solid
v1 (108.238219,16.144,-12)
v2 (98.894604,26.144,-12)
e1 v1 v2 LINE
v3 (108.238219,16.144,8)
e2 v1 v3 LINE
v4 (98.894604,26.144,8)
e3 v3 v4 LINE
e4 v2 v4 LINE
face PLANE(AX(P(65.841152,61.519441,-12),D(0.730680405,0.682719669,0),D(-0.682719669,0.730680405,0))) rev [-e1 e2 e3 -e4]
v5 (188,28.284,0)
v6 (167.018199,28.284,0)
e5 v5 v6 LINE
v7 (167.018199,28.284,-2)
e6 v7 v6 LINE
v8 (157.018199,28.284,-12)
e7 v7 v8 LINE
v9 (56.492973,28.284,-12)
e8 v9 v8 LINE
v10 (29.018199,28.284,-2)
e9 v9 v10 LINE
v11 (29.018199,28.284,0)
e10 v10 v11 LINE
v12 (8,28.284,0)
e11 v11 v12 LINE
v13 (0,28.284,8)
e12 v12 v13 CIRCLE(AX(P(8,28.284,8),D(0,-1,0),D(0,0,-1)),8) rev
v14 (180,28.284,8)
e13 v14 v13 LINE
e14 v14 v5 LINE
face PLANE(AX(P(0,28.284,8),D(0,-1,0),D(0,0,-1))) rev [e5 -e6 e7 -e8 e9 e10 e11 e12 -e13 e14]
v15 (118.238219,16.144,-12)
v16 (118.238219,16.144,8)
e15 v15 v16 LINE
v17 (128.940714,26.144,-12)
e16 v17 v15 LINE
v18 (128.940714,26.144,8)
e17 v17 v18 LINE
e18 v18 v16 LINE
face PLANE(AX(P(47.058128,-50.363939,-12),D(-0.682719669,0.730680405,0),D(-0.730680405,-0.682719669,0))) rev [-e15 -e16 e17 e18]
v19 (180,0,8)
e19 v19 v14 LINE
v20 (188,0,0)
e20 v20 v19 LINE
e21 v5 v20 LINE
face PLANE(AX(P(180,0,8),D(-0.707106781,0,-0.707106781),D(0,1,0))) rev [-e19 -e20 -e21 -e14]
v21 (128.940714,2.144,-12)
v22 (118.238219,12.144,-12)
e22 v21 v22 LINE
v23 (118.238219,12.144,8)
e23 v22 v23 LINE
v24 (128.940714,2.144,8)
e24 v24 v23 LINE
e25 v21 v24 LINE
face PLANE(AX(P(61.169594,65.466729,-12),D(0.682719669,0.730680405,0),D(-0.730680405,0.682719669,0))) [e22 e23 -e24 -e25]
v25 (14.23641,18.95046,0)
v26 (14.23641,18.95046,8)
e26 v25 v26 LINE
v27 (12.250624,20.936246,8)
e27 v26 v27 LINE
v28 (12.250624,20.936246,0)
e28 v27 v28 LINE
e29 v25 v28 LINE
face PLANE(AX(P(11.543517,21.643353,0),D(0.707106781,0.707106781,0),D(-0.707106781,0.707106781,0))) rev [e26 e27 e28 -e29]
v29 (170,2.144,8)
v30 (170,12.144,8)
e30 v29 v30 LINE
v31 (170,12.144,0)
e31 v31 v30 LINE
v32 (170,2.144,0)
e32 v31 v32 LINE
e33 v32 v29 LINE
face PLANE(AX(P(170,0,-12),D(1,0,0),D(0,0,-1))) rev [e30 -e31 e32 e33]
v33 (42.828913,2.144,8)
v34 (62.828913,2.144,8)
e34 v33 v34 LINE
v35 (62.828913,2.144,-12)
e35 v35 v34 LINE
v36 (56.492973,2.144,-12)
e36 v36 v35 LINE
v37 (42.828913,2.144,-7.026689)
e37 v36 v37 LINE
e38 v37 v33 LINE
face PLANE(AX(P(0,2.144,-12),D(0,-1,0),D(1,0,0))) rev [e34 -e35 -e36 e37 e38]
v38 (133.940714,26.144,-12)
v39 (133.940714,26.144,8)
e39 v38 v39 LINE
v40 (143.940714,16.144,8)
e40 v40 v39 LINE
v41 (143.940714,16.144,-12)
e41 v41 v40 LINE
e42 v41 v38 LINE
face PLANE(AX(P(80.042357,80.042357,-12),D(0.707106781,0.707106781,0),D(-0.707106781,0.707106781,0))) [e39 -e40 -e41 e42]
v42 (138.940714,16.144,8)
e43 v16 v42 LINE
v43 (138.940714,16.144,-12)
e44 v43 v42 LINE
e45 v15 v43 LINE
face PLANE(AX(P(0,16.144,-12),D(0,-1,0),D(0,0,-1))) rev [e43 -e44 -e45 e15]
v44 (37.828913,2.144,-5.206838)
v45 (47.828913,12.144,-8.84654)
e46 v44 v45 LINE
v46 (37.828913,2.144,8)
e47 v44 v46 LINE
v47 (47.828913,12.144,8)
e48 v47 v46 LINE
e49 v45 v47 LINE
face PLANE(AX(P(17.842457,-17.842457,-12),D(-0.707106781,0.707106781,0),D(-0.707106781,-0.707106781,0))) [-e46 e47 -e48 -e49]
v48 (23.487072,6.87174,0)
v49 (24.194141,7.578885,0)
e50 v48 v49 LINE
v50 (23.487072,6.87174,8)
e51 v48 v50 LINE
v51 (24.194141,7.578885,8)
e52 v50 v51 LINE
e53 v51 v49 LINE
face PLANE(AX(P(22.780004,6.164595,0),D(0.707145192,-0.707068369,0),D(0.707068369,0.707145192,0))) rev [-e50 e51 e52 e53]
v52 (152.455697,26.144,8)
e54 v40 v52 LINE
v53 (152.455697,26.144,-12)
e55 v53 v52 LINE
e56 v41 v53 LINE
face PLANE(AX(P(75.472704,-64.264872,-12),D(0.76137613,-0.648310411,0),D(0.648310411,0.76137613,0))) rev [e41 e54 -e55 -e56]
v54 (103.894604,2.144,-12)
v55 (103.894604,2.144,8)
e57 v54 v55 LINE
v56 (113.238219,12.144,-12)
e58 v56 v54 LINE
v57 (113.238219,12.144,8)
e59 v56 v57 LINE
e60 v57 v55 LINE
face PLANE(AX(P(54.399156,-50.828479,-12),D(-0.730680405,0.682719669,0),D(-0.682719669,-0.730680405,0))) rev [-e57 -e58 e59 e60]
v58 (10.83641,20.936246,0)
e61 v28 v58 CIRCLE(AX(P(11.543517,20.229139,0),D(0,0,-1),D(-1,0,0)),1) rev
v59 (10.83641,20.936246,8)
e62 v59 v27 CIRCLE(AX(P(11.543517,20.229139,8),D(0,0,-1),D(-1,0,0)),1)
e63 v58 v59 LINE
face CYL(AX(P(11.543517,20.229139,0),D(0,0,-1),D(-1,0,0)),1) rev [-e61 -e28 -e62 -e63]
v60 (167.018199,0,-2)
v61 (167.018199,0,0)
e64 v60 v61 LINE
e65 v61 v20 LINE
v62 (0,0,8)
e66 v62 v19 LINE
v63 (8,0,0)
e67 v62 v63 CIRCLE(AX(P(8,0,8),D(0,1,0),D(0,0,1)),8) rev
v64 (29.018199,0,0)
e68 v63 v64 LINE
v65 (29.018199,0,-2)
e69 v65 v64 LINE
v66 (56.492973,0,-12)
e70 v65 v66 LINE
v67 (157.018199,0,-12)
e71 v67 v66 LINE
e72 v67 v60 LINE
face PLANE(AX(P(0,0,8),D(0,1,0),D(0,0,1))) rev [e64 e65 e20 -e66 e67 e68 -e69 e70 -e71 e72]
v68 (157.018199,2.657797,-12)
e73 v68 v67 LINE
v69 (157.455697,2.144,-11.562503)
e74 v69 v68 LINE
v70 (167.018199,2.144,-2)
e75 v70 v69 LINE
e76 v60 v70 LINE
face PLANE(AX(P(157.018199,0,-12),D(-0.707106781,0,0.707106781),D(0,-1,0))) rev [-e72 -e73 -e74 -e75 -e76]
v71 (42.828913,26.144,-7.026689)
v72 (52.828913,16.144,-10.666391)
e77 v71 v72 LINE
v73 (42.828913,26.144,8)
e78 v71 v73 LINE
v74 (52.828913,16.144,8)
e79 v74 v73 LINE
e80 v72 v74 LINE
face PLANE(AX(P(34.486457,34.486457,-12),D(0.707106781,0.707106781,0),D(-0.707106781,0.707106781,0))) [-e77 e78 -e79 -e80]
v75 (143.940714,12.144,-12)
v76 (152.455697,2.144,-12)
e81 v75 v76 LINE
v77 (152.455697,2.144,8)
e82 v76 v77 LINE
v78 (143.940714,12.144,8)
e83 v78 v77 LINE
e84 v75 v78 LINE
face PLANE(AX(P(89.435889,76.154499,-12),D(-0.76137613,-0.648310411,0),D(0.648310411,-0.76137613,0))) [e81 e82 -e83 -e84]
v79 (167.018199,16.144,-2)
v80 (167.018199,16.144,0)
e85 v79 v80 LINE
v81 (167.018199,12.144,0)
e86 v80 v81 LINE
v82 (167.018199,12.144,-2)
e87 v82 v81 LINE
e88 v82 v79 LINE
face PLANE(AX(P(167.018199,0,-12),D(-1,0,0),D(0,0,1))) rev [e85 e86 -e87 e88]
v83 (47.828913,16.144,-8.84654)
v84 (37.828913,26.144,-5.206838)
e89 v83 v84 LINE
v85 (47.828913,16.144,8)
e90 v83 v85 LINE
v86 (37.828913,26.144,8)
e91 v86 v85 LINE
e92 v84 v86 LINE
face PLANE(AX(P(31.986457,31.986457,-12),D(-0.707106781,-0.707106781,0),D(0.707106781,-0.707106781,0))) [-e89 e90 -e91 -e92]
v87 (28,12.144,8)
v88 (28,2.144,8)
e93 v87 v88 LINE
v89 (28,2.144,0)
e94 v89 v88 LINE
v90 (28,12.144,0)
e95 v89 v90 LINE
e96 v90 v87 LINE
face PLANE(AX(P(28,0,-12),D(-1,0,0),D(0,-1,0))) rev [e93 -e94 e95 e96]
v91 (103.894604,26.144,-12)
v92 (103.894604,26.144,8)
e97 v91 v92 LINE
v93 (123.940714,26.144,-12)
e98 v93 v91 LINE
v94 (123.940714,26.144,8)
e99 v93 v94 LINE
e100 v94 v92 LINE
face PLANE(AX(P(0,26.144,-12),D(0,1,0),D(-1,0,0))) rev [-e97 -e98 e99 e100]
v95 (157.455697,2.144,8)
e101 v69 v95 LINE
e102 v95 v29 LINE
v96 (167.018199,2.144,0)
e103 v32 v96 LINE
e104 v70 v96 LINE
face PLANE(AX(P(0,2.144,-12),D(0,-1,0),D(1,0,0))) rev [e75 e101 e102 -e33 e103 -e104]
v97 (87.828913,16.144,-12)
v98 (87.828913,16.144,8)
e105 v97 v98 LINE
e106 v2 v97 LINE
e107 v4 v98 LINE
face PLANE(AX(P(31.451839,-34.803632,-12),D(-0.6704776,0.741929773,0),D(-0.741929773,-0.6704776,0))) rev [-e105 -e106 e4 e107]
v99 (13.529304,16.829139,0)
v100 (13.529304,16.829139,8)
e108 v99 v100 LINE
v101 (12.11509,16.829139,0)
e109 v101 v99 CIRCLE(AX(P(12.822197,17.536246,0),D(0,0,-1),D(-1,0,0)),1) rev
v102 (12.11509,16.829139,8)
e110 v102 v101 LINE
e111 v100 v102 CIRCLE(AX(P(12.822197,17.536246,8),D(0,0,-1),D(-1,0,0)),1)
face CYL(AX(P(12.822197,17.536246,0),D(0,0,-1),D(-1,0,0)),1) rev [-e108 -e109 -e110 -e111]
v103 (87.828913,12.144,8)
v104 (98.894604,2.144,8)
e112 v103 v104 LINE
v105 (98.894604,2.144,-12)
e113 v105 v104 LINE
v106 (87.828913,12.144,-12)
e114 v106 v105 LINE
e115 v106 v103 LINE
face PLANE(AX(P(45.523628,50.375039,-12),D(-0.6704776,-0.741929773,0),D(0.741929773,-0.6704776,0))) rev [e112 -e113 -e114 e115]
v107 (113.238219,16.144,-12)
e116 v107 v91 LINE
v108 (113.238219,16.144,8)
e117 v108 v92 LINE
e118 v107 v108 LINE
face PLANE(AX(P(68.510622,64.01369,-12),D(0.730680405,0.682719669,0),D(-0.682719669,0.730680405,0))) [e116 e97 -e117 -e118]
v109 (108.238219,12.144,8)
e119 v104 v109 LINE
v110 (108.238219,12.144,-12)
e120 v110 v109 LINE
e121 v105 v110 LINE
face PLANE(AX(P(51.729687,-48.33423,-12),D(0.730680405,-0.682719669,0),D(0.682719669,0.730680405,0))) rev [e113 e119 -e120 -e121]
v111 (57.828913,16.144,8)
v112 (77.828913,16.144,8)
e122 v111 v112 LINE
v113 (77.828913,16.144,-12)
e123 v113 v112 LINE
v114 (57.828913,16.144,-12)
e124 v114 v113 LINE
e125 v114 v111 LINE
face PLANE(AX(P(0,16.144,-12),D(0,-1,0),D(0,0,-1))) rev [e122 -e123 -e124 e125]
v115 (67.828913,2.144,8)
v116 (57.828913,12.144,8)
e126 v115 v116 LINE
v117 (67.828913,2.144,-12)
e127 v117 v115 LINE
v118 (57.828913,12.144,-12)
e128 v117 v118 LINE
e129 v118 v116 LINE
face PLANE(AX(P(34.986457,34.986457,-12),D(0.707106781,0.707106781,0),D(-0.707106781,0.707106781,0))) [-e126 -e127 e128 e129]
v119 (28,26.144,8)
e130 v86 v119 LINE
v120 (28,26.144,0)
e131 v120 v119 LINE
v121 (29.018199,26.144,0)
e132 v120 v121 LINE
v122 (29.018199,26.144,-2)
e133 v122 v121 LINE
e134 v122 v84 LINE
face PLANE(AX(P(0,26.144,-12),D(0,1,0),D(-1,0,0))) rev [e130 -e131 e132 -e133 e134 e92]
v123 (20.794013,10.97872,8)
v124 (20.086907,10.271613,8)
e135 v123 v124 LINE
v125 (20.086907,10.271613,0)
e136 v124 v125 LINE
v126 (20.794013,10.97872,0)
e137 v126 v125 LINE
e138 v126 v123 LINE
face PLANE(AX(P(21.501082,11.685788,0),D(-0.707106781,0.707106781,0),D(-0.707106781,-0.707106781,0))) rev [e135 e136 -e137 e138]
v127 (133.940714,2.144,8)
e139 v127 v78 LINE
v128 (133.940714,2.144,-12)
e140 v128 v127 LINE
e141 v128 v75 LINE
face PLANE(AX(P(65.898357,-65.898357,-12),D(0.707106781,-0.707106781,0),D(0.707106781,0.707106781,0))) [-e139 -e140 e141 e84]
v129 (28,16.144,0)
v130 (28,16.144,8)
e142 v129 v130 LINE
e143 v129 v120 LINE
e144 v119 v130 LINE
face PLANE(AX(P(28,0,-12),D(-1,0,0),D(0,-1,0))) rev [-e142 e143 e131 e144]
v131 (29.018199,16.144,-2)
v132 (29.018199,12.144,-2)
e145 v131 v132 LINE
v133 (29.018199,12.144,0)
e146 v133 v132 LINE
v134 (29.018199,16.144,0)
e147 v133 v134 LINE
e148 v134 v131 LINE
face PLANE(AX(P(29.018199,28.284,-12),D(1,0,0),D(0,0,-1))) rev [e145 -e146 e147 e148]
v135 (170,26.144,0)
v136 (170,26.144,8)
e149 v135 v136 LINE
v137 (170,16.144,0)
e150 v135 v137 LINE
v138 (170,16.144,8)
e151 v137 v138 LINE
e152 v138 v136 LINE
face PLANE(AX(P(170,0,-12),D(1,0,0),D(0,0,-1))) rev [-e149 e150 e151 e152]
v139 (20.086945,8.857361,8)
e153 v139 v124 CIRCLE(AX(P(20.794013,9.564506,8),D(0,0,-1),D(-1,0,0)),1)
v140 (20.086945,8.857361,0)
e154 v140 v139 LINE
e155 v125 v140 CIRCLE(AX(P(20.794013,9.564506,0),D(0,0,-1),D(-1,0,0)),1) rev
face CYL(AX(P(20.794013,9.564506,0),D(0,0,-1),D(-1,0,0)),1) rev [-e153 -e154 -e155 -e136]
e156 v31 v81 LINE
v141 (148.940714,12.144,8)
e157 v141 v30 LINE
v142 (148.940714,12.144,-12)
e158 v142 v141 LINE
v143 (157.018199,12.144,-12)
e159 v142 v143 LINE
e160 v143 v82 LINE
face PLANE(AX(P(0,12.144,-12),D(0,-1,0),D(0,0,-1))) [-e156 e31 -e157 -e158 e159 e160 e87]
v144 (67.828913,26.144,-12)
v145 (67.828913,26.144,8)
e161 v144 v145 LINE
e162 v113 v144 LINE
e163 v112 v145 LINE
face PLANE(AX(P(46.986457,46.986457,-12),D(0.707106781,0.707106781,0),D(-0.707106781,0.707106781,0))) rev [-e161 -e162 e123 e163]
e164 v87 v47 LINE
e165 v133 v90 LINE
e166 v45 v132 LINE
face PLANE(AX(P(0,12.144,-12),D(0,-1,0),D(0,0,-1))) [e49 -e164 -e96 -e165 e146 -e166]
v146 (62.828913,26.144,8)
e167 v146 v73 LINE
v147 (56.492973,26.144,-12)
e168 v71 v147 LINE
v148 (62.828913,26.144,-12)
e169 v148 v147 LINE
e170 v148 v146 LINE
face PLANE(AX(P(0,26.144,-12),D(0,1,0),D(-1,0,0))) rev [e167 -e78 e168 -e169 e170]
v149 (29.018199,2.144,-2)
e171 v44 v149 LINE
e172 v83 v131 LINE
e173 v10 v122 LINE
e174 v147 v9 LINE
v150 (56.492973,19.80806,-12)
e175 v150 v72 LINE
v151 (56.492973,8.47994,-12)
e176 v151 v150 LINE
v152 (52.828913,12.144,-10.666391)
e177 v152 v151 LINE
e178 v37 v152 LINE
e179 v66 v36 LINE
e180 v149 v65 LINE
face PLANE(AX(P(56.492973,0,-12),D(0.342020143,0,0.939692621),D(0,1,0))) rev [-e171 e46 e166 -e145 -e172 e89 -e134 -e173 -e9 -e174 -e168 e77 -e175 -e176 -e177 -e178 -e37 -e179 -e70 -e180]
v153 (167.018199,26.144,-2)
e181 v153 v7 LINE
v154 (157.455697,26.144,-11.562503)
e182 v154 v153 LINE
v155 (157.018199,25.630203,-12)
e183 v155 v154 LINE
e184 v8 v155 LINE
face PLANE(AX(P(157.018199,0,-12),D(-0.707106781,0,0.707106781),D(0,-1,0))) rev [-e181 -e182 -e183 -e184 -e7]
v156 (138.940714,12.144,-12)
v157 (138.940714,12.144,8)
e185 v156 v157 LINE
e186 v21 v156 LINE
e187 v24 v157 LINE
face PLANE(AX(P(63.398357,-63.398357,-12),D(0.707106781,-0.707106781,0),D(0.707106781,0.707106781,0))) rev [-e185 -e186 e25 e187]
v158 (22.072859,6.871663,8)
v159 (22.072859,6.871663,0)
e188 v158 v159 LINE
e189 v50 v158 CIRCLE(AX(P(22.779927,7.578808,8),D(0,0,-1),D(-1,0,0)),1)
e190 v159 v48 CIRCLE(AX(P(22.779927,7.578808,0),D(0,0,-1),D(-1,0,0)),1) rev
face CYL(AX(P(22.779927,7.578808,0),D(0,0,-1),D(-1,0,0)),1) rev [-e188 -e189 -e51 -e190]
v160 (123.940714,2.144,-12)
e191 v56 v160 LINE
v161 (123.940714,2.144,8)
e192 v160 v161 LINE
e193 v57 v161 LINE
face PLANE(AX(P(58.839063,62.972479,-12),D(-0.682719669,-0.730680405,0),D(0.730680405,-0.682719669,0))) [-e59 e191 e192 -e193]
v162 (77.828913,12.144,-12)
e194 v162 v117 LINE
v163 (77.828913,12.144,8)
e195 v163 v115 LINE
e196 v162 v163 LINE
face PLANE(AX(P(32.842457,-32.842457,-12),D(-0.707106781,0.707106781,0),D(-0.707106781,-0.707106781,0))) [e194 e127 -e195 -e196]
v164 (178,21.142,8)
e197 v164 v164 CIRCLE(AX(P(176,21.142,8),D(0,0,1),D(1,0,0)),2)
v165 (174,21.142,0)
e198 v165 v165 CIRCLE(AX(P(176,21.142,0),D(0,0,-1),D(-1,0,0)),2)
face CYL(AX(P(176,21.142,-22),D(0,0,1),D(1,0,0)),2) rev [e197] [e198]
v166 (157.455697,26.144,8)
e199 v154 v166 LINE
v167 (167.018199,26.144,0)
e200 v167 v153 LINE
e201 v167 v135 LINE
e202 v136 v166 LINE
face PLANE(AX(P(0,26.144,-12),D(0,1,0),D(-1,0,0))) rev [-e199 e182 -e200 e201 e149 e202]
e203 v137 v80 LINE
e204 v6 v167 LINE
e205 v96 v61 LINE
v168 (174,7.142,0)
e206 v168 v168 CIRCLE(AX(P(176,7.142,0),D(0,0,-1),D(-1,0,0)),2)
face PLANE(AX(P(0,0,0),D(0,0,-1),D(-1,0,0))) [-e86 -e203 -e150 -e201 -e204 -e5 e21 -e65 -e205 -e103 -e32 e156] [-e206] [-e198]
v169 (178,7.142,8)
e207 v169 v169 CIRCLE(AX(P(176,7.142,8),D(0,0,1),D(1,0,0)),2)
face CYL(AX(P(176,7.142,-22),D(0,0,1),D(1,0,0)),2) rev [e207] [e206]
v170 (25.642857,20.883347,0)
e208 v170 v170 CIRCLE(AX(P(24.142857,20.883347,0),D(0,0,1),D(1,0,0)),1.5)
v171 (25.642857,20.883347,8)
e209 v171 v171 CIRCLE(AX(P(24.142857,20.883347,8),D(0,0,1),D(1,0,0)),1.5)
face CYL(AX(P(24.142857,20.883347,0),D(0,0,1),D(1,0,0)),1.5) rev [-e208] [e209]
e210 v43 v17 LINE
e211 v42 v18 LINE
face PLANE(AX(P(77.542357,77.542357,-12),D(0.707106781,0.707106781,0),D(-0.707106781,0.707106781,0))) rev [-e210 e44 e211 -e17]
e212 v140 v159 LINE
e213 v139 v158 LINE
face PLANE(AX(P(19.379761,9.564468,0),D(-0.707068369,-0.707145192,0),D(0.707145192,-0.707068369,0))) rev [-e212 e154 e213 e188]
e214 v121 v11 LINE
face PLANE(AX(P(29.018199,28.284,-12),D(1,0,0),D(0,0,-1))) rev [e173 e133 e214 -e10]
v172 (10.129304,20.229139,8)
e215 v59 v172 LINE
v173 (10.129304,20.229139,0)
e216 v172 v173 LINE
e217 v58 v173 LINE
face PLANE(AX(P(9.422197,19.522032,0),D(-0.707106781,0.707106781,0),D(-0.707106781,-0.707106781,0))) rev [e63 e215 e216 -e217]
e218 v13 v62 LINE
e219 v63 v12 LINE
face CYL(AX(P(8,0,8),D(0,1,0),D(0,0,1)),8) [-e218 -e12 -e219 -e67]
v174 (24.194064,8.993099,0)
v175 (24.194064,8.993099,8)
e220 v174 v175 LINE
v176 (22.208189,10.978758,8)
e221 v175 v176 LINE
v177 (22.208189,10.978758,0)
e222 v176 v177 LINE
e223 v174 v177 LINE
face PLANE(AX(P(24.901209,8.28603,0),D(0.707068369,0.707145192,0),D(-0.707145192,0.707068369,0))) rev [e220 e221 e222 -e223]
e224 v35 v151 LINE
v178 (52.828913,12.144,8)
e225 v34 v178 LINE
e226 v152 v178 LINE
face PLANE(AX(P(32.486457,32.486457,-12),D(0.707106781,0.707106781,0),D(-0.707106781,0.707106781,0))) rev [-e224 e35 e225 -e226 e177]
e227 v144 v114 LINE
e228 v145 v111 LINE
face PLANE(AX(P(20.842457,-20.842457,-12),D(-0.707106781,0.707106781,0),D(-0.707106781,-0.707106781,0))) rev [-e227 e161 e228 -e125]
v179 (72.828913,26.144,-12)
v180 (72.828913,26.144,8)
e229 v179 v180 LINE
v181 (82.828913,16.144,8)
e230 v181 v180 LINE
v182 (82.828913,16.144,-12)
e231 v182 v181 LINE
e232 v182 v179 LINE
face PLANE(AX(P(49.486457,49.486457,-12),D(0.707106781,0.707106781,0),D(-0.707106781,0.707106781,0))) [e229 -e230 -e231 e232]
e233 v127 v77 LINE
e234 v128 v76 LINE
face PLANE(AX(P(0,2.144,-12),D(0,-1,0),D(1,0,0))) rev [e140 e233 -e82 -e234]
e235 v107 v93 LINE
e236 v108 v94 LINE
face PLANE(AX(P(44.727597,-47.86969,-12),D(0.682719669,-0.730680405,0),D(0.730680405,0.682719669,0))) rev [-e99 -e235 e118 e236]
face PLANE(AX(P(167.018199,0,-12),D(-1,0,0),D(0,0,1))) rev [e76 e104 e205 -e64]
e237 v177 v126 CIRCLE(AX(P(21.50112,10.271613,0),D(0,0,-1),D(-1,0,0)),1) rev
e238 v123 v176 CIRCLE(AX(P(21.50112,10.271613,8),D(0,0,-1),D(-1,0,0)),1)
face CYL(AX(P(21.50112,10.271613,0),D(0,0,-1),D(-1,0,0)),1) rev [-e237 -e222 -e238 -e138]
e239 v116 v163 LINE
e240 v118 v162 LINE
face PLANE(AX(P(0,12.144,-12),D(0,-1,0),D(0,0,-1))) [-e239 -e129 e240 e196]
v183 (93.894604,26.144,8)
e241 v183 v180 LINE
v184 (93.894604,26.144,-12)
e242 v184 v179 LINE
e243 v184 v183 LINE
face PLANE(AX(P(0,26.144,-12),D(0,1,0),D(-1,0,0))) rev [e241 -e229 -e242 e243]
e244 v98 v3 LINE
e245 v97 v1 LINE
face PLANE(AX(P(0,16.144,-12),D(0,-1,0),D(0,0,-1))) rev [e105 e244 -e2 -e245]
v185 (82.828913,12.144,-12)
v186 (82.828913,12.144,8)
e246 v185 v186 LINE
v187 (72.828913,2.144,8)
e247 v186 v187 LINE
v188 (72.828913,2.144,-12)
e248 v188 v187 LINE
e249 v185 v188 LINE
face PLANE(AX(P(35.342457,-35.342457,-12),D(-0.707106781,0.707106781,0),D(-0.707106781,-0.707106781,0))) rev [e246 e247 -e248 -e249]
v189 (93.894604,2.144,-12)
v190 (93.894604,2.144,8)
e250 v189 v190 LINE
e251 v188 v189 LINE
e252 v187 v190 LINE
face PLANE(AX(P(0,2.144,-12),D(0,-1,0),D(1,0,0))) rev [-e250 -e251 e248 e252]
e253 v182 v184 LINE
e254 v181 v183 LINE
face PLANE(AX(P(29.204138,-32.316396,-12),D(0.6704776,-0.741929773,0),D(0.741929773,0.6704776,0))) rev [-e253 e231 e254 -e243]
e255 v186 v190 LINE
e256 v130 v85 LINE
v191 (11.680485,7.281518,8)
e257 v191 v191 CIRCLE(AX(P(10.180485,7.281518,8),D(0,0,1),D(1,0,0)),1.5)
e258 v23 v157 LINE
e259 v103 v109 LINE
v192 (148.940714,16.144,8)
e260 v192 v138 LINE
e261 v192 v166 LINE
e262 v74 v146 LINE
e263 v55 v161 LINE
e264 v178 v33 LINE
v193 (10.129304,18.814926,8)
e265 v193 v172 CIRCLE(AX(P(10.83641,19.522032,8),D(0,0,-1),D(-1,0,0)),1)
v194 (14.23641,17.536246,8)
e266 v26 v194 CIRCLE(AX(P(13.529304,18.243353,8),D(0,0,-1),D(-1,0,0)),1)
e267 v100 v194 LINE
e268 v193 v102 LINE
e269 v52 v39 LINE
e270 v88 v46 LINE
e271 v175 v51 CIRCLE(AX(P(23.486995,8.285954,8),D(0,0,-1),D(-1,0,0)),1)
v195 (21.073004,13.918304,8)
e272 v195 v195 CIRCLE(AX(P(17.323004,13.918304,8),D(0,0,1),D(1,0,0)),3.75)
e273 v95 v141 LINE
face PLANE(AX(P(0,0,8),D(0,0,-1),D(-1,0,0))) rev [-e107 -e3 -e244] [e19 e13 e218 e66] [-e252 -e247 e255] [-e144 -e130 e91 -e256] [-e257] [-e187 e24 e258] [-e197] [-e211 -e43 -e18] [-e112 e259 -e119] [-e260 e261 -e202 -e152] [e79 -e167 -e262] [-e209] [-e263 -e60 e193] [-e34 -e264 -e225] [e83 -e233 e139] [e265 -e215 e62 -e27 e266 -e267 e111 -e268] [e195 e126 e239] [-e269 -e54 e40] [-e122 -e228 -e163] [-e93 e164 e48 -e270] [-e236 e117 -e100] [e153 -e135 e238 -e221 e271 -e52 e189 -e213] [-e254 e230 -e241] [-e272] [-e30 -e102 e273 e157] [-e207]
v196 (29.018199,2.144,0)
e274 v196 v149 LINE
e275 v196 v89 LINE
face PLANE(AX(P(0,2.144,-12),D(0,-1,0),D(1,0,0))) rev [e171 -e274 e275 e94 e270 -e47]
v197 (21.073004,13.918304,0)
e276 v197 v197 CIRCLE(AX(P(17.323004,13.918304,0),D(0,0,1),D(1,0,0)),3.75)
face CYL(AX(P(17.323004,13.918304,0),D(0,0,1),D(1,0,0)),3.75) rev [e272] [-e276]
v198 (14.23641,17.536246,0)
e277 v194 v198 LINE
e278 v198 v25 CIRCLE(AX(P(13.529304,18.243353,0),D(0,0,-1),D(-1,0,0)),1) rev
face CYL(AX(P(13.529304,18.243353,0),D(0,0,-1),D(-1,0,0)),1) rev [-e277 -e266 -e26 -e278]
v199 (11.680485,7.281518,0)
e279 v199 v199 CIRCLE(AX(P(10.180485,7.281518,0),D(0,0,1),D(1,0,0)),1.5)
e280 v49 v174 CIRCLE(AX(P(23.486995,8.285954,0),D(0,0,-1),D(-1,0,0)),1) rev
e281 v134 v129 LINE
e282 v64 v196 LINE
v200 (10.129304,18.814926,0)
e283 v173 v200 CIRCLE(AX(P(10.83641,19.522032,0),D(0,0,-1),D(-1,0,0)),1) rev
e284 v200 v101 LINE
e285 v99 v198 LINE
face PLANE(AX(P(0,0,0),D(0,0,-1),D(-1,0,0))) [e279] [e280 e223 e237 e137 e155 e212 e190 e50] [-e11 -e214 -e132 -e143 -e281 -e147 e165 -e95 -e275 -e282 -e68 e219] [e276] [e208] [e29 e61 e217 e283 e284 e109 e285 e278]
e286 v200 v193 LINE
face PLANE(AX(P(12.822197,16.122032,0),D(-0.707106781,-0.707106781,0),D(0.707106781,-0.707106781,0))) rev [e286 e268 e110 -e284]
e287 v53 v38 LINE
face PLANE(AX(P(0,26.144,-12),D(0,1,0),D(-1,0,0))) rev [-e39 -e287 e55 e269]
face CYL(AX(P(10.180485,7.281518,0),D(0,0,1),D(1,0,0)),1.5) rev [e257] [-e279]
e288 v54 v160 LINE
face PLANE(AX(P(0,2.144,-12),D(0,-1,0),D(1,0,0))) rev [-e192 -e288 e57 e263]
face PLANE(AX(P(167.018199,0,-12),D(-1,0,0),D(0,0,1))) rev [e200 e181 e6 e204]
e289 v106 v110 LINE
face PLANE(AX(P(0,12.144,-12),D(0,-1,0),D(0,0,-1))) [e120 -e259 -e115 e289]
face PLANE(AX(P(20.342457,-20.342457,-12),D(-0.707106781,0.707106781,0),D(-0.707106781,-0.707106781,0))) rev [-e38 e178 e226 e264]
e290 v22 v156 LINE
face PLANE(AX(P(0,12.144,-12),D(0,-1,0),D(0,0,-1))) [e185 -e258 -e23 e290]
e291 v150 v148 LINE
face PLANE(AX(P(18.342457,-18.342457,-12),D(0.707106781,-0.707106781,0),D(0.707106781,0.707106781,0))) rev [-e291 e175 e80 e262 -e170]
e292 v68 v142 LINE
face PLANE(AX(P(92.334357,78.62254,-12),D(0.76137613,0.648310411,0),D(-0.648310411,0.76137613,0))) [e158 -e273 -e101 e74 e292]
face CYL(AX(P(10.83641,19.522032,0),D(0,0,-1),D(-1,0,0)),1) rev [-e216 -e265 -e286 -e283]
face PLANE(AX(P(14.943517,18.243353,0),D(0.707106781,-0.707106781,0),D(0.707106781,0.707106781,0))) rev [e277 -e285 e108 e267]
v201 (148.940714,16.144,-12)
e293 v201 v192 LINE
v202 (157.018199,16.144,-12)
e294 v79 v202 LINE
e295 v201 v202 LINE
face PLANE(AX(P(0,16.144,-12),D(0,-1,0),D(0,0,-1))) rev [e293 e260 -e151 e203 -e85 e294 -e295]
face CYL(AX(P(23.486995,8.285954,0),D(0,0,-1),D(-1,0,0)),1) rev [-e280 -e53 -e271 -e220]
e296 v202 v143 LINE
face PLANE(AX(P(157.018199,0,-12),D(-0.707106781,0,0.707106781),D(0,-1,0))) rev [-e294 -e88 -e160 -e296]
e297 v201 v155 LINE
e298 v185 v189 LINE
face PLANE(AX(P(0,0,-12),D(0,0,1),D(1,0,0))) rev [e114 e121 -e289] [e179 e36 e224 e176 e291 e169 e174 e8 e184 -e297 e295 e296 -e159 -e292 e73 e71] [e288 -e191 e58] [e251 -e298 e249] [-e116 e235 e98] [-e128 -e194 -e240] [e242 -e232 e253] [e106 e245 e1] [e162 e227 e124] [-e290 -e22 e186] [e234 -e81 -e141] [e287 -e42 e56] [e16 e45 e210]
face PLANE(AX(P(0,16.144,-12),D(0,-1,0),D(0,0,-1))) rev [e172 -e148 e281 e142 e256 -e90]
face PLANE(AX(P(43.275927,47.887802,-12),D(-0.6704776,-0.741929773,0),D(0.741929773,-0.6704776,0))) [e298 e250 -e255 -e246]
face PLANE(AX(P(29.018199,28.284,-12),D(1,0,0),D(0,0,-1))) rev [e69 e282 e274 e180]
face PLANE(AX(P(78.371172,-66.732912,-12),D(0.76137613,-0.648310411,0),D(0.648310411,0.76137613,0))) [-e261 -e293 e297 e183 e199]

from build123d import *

# Parameters (mm, degrees)
ESQUISSE1_W         = 200
ESQUISSE1_H         = 28.284
BOSS_EXTRU_3_DEPTH  = 8
CHANFREIN1_SIZE     = 20
ESQUISSE4_R         = 2
CUT_EXTRUDE5_DEPTH  = 30
FILLET1_R           = 8
SKETCH2_R           = 1.5
SKETCH2_R_2         = 3.75
CUT_EXTRUDE1_DEPTH  = 8
FILLET9_R           = 1
FILLET10_R          = 1
SKETCH6_W           = 138
SKETCH6_H           = 28.284
BOSS_EXTRUDE3_DEPTH = 12
CHAMFER2_SIZE       = 10
CHAMFER2_SIZE2      = 27.474774195
CUT_EXTRUDE6_DEPTH  = 20
CHAMFER8_SIZE       = 10
CHAMFER9_SIZE       = 10


# Some blends are built 0.0001 mm under size
with BuildPart() as part:
    # Esquisse1 → Boss.-Extru.3 (new body)
    with BuildSketch(Plane.XY):
        with Locations((100, 14.142)):
            Rectangle(ESQUISSE1_W, ESQUISSE1_H)
    extrude(amount=BOSS_EXTRU_3_DEPTH)

    # Chanfrein1
    # the kernel refuses this chamfer: 20 mm, written as the material it takes off along each edge
    with BuildSketch(Plane(origin=(200, -51.433659759, 8), x_dir=(0.027495876610586317, 0, -0.9996219169112968), z_dir=(0, 1, 0))) as chanfrein1_piece_1:
        Polygon((CHANFREIN1_SIZE * 0.999621916911, CHANFREIN1_SIZE * 0.0274958766106), (-CHANFREIN1_SIZE * 0.0274958766106, CHANFREIN1_SIZE * 0.999621916911), (0, 0), align=None)
    extrude(amount=131.151319519, mode=Mode.SUBTRACT)

    # Esquisse4 → Cut-Extrude5 (cut)
    with BuildSketch(Plane.XY.offset(8)):
        with Locations((176, 7.142)):
            Circle(ESQUISSE4_R)
        with Locations((176, 21.142)):
            Circle(ESQUISSE4_R)
    extrude(amount=-CUT_EXTRUDE5_DEPTH, mode=Mode.SUBTRACT)

    # Fillet1
    fillet1_edges = [part.edges().sort_by_distance(p)[0] for p in [
        (0, 14.142, 0),
    ]]
    fillet(fillet1_edges, radius=FILLET1_R - 0.0001)  # a hair under: the kernel refuses the full size

    # Sketch2 → Cut-Extrude1 (cut)
    with BuildSketch(Plane.XY.offset(8)):
        with Locations((10.180485171, 7.281517741)):
            Circle(SKETCH2_R)
        with Locations((24.142857006, 20.883346587)):
            Circle(SKETCH2_R)
        with Locations((17.323003706, 13.918303783)):
            Circle(SKETCH2_R_2)
        Polygon((14.943517177, 18.243352736), (12.822196834, 16.122032392), (9.422196834, 19.522032392), (11.543517177, 21.643352736), align=None)
        Polygon((19.379761465, 9.564467761), (22.780003771, 6.164594852), (24.901208877, 8.286030428), (21.501081812, 11.685788108), align=None)
    extrude(amount=-CUT_EXTRUDE1_DEPTH, mode=Mode.SUBTRACT)

    # Fillet9
    fillet9_edges = [part.edges().sort_by_distance(p)[0] for p in [
        (9.422196834, 19.522032392, 4),
        (11.543517177, 21.643352736, 4),
        (14.943517177, 18.243352736, 4),
        (12.822196834, 16.122032392, 4),
    ]]
    fillet(fillet9_edges, radius=FILLET9_R)

    # Fillet10
    fillet10_edges = [part.edges().sort_by_distance(p)[0] for p in [
        (24.901208877, 8.286030428, 4),
        (22.780003771, 6.164594852, 4),
        (19.379761465, 9.564467761, 4),
        (21.501081812, 11.685788108, 4),
    ]]
    fillet(fillet10_edges, radius=FILLET10_R)

    # Sketch6 → Boss-Extrude3 (add)
    with BuildSketch(Plane(origin=(0, 0, 0), x_dir=(-1, 0, 0), z_dir=(0, 0, -1))):
        with Locations((-98.018199025, 14.142)):
            Rectangle(SKETCH6_W, SKETCH6_H)
    extrude(amount=BOSS_EXTRUDE3_DEPTH)

    # Chamfer2
    chamfer2_edges = [part.edges().sort_by_distance(p)[0] for p in [
        (29.018199025, 14.142, -12),
    ]]
    chamfer2_side = [part.faces().sort_by_distance(p)[0] for p in [
        (29.018199025, 14.142, -6),
    ]]
    chamfer(chamfer2_edges, length=CHAMFER2_SIZE, length2=CHAMFER2_SIZE2, reference=chamfer2_side[0])

    # Sketch4 → Cut-Extrude6 (cut)
    with BuildSketch(Plane.XY.offset(8)):
        Polygon((47.82891302, 12.144), (28, 12.144), (28, 2.144), (37.82891302, 2.144), align=None)
        Polygon((62.82891302, 2.144), (52.82891302, 12.144), (42.82891302, 2.144), align=None)
        Polygon((77.82891302, 12.144), (57.82891302, 12.144), (67.82891302, 2.144), align=None)
        Polygon((82.82891302, 12.144), (72.82891302, 2.144), (93.894603713, 2.144), align=None)
        Polygon((108.238219115, 12.144), (87.82891302, 12.144), (98.894603713, 2.144), align=None)
        Polygon((113.238219115, 12.144), (103.894603713, 2.144), (123.940714423, 2.144), align=None)
        Polygon((138.940714423, 12.144), (118.238219115, 12.144), (128.940714423, 2.144), align=None)
        Polygon((143.940714423, 12.144), (133.940714423, 2.144), (152.455696505, 2.144), align=None)
        Polygon((170, 12.144), (148.940714423, 12.144), (157.455696505, 2.144), (170, 2.144), align=None)
        Polygon((157.455696505, 26.144), (148.940714423, 16.144), (170, 16.144), (170, 26.144), align=None)
        Polygon((152.455696505, 26.144), (133.940714423, 26.144), (143.940714423, 16.144), align=None)
        Polygon((128.940714423, 26.144), (118.238219115, 16.144), (138.940714423, 16.144), align=None)
        Polygon((123.940714423, 26.144), (103.894603713, 26.144), (113.238219115, 16.144), align=None)
        Polygon((98.894603713, 26.144), (87.82891302, 16.144), (108.238219115, 16.144), align=None)
        Polygon((93.894603713, 26.144), (72.82891302, 26.144), (82.82891302, 16.144), align=None)
        Polygon((67.82891302, 26.144), (57.82891302, 16.144), (77.82891302, 16.144), align=None)
        Polygon((62.82891302, 26.144), (42.82891302, 26.144), (52.82891302, 16.144), align=None)
        Polygon((37.82891302, 26.144), (28, 26.144), (28, 16.144), (47.82891302, 16.144), align=None)
    extrude(amount=-CUT_EXTRUDE6_DEPTH, mode=Mode.SUBTRACT)

    # Chamfer8
    chamfer8_edges = [part.edges().sort_by_distance(p)[0] for p in [
        (167.018199025, 1.072, -12),
        (167.018199025, 14.144, -12),
    ]]
    chamfer(chamfer8_edges, length=CHAMFER8_SIZE)

    # Chamfer9
    chamfer9_edges = [part.edges().sort_by_distance(p)[0] for p in [
        (167.018199025, 27.214, -12),
    ]]
    chamfer(chamfer9_edges, length=CHAMFER9_SIZE)


solid = part.part
